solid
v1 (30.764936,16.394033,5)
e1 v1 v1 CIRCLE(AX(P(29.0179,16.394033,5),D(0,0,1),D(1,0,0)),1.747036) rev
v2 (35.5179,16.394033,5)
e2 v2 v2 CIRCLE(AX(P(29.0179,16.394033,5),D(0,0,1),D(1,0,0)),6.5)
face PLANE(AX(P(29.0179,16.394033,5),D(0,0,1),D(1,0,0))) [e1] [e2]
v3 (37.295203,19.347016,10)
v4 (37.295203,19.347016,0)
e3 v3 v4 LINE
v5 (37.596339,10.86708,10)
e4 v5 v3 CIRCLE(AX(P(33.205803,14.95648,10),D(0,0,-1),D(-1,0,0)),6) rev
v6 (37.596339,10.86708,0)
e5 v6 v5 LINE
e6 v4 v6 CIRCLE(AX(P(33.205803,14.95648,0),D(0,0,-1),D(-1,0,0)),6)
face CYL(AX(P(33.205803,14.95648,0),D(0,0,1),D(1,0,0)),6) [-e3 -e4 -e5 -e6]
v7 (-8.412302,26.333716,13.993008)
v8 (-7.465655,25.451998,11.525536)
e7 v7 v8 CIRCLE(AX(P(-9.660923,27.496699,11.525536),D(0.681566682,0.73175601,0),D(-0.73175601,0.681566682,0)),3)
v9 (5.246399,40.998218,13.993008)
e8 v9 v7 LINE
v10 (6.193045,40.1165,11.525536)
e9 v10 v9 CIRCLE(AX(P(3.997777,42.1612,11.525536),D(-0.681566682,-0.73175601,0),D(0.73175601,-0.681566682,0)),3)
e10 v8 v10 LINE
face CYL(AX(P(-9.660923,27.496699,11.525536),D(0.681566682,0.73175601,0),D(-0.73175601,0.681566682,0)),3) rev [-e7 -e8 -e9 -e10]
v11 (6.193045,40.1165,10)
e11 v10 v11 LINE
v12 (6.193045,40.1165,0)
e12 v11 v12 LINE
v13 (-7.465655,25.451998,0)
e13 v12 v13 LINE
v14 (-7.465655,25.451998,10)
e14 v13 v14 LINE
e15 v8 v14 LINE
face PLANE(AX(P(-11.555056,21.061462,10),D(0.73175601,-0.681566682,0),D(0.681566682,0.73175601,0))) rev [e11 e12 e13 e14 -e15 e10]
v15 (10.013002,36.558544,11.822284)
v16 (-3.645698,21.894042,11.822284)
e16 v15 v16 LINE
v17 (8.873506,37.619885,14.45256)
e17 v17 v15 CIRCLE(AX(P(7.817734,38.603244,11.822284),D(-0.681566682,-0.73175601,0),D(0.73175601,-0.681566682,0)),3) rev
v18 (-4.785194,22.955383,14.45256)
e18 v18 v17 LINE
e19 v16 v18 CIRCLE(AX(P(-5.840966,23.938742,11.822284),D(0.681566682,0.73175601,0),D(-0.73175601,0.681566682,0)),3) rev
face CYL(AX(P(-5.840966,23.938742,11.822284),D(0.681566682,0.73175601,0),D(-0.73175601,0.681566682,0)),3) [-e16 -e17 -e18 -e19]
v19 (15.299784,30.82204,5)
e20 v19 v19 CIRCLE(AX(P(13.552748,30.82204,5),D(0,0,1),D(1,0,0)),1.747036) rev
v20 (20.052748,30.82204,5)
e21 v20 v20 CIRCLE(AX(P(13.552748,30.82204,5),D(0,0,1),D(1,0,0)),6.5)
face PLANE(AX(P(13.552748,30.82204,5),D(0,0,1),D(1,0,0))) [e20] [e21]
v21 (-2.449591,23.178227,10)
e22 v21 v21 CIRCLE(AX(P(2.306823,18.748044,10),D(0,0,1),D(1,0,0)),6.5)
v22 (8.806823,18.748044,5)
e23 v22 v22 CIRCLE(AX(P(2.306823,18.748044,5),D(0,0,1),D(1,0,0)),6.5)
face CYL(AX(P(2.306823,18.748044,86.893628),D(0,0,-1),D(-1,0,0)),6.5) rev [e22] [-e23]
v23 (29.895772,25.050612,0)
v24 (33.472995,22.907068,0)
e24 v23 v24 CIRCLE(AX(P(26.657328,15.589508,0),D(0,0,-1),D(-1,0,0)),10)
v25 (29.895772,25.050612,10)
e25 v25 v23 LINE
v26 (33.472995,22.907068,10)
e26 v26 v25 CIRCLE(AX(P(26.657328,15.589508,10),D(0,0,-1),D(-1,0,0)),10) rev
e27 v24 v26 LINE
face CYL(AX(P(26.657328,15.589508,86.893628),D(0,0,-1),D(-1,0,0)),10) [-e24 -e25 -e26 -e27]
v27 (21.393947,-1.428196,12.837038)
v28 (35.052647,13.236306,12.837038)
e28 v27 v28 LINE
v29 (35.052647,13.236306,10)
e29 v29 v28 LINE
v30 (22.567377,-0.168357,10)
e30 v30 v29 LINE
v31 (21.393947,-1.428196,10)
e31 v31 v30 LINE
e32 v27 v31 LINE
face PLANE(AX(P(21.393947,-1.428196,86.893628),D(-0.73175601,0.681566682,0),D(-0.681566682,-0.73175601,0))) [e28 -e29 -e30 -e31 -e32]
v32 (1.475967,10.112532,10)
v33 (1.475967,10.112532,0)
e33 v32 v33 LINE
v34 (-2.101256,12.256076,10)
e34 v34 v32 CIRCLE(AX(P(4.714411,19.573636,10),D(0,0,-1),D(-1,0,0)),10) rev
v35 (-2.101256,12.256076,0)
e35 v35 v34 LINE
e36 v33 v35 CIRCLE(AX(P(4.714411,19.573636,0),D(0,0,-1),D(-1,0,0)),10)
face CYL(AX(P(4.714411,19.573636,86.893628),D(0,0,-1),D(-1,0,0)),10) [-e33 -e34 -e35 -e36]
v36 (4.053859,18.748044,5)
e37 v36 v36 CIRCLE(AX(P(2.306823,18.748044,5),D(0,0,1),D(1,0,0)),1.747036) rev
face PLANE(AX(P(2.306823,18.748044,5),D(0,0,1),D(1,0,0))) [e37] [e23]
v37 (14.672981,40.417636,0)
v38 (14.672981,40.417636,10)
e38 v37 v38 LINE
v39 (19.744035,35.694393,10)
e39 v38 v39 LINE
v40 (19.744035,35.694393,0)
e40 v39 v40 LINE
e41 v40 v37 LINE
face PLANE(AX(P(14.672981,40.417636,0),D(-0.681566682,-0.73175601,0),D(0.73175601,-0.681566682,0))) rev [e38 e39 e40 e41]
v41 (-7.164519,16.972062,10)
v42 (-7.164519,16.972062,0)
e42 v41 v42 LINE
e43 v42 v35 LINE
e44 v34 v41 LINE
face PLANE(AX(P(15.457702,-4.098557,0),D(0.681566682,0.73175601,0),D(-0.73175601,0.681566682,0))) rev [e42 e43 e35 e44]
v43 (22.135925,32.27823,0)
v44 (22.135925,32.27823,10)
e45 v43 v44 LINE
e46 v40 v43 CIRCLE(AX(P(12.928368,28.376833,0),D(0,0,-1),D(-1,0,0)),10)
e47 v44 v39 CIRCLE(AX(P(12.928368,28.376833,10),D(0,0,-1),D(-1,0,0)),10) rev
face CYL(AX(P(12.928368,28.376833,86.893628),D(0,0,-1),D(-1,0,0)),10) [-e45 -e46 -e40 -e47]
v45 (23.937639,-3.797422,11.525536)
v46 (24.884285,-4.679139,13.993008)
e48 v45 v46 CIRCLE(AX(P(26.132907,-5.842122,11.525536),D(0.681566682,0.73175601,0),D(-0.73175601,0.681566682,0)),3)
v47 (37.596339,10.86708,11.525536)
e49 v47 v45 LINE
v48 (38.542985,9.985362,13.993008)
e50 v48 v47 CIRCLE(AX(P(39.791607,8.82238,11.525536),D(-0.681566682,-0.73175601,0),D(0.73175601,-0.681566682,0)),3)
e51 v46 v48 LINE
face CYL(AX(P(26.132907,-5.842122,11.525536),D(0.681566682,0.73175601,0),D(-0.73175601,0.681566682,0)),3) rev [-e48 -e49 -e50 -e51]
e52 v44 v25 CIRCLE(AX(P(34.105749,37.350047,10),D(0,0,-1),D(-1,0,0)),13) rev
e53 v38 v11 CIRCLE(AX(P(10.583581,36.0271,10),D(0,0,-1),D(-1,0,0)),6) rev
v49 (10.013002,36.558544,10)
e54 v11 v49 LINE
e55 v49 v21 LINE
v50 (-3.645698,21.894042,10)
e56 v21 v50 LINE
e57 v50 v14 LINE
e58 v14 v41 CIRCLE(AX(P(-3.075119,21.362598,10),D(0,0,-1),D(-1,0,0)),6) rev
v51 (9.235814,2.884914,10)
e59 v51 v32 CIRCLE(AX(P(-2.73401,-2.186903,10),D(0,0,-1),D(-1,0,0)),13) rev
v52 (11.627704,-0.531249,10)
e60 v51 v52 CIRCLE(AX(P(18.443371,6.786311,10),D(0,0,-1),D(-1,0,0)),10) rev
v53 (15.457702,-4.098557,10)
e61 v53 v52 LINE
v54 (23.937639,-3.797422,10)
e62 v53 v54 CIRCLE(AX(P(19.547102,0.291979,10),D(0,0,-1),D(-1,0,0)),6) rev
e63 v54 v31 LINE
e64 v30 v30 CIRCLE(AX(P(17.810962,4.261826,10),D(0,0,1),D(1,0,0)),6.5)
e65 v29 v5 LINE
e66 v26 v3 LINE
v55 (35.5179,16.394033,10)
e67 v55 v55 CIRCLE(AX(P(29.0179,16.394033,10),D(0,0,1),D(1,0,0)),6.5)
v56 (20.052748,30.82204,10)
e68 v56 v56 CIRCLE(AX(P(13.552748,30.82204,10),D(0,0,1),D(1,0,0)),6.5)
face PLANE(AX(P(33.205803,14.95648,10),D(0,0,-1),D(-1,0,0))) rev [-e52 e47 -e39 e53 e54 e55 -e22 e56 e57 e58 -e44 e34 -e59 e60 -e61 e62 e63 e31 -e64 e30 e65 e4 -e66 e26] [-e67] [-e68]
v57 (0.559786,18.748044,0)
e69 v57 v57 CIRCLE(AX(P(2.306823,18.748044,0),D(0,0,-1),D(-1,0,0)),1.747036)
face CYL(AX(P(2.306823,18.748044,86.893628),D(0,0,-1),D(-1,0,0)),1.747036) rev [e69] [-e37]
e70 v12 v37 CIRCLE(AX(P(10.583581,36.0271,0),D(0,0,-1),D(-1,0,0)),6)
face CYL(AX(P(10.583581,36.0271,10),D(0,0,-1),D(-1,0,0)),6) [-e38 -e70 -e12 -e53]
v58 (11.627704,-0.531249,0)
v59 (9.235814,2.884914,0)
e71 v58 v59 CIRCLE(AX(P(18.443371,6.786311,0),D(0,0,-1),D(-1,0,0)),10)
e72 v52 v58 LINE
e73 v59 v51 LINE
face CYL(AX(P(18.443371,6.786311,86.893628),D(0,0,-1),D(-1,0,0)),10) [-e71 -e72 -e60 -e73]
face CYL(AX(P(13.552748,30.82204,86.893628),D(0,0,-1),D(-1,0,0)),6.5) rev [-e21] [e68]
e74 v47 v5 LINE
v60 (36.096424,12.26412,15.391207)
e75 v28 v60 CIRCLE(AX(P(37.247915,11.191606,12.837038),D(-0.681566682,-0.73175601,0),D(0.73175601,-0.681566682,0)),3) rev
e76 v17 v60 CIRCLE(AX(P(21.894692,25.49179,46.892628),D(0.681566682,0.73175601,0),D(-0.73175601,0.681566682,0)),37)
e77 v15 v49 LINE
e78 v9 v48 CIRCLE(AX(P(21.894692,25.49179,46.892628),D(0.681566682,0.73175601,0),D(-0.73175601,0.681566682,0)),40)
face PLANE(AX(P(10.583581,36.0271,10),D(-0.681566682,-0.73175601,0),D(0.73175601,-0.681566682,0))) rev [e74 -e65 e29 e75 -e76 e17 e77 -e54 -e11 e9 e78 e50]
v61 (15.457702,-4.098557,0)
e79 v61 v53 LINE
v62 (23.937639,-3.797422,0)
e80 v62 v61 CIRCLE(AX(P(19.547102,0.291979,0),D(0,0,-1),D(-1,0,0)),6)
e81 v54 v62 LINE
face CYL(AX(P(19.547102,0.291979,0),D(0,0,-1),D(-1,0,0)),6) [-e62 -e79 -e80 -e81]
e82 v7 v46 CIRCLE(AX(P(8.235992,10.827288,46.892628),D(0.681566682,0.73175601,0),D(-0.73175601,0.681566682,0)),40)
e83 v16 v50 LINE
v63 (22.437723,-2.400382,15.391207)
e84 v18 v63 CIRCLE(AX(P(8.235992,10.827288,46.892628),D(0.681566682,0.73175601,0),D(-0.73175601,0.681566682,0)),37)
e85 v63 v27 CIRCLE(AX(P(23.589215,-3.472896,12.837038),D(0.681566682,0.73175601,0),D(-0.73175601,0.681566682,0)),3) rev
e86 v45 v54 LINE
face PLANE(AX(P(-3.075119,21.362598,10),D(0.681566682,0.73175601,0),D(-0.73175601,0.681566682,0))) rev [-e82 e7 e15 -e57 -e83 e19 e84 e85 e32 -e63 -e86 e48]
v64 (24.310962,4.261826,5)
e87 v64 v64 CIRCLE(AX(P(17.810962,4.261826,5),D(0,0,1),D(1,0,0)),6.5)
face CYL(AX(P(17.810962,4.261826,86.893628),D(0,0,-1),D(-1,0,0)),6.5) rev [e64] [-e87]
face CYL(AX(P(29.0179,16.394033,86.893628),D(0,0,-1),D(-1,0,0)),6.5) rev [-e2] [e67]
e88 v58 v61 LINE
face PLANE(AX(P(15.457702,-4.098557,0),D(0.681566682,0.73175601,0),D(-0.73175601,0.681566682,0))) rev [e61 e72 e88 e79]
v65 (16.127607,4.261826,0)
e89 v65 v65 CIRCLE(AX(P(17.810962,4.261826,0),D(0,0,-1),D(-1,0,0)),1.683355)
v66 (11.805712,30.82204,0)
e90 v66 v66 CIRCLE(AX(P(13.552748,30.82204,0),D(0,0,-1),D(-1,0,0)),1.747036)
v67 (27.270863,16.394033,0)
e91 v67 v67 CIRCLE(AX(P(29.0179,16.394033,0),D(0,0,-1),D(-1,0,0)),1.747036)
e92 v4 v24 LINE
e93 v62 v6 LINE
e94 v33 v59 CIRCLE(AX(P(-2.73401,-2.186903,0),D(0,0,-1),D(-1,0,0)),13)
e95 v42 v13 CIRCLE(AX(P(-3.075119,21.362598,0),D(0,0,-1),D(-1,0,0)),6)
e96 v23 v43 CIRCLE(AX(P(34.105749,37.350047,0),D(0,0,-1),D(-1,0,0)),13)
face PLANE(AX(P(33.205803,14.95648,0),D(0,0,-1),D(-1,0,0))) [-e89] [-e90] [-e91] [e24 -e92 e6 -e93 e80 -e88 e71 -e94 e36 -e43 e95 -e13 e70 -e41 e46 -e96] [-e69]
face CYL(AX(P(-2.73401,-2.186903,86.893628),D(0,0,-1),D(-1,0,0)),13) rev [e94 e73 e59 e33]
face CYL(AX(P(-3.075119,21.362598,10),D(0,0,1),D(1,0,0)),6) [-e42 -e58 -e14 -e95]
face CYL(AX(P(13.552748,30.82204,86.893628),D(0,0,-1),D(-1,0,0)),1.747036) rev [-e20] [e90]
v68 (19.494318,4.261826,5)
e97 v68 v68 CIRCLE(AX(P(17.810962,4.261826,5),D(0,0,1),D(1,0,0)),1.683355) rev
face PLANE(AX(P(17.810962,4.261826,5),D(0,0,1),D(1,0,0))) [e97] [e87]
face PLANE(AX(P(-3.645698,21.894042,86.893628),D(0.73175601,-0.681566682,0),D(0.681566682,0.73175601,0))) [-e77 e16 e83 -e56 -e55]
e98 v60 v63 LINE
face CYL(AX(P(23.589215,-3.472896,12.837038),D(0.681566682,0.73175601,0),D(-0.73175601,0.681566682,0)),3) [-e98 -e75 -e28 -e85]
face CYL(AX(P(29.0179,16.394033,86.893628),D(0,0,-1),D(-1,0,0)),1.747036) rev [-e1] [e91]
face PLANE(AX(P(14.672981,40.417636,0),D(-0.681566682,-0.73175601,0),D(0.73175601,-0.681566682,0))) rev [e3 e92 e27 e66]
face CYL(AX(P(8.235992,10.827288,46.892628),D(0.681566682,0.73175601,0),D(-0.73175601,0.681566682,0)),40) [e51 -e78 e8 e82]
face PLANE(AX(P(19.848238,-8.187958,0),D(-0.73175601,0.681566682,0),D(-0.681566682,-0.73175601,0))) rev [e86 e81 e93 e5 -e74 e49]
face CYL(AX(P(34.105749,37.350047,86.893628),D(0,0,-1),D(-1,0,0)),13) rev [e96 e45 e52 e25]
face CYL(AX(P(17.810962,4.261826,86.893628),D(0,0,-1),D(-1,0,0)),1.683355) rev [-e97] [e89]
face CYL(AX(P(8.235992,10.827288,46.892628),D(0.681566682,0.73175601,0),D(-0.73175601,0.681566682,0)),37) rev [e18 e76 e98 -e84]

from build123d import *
from build123d.topology import SkipClean

# Parameters (mm, degrees)
BOSS_EXTRUDE2_DEPTH            = 10
SKETCH3_R                      = 40
SKETCH3_R_2                    = 37
BOSS_EXTRUDE3_DEPTH            = 20.040152
CUT_EXTRUDE1_REACH             = 115.803
CUT_EXTRUDE1_END_RADIUS        = 37
SKETCH5_R                      = 1.74703634
SKETCH5_R_2                    = 1.683355043
SKETCH10_W                     = 30.914979244
SKETCH10_H                     = 10
BOSS_EXTRUDE8_DEPTH            = 6
SKETCH11_W                     = 30.914979244
SKETCH11_H                     = 10
BOSS_EXTRUDE9_DEPTH            = 6
SKETCH12_W                     = 10
SKETCH12_H                     = 32.040152213
BOSS_EXTRUDE10_DEPTH           = 6
SKETCH13_W                     = 10
SKETCH13_H                     = 32.040152213
BOSS_EXTRUDE11_DEPTH           = 6
FILLET3_R                      = 6
BOSS_EXTRUDE12_REACH           = 108.364
BOSS_EXTRUDE13_REACH           = 108.364
SKETCH17_R                     = 6.5
CUT_EXTRUDE3_DEPTH             = 5
CUT_EXTRUDE3_DIRECTION_2_REACH = 108.364
CUT_EXTRUDE4_REACH             = 108.364
CUT_EXTRUDE4_END_RADIUS        = 37
FILLET4_R                      = 3
CUT_EXTRUDE5_REACH             = 115.803
FILLET5_R                      = 10


with BuildPart() as part:
    # Sketch1 → Boss-Extrude2 (new body)
    with BuildSketch(Plane.XY):
        Polygon((-3.075119388, 21.362598398), (19.547102475, 0.291978577), (33.205802521, 14.956480402), (10.583580658, 36.027100222), align=None)
    extrude(amount=BOSS_EXTRUDE2_DEPTH)

    # Sketch3 → Boss-Extrude3 (add)
    with BuildSketch(Plane(origin=(22.884598517, 24.569778644, 0), x_dir=(-0.7317560100777086, 0.6815666817818727, 0), z_dir=(0.6815666817818727, 0.7317560100777086, 0))):
        with Locations((1.352782776, 46.892628188)):
            Circle(SKETCH3_R)
        with Locations((1.352782776, 46.892628188)):
            Circle(SKETCH3_R_2, mode=Mode.SUBTRACT)
    extrude(amount=-BOSS_EXTRUDE3_DEPTH)

    # Cut-Extrude1: up to this cylinder (the profile starts outside it)
    cut_extrude1_end = Plane(origin=(15.043707154, 18.136311869, 46.892628188), z_dir=(0.6815666817818727, 0.7317560100777086, 0)) * Cylinder(CUT_EXTRUDE1_END_RADIUS, 323.139339437, mode=Mode.PRIVATE)
    # Sketch5 → Cut-Extrude1 (cut, up to the surface)
    with BuildSketch(Plane(origin=(0, 0, 0), x_dir=(-1, 0, 0), z_dir=(0, 0, -1)), mode=Mode.PRIVATE) as cut_extrude1_sk1:
        with Locations((-13.552748015, 30.82203985)):
            Circle(SKETCH5_R)
    cut_extrude1_tool1 = extrude(cut_extrude1_sk1.sketch, amount=-CUT_EXTRUDE1_REACH, mode=Mode.PRIVATE) - cut_extrude1_end
    add(cut_extrude1_tool1.solids().sort_by_distance((13.552748, 30.82204, 0))[0], mode=Mode.SUBTRACT)
    # Sketch5 → Cut-Extrude1 (cut, up to the surface)
    with BuildSketch(Plane(origin=(0, 0, 0), x_dir=(-1, 0, 0), z_dir=(0, 0, -1)), mode=Mode.PRIVATE) as cut_extrude1_sk2:
        with Locations((-2.306822594, 18.748043967)):
            Circle(SKETCH5_R)
    cut_extrude1_tool2 = extrude(cut_extrude1_sk2.sketch, amount=-CUT_EXTRUDE1_REACH, mode=Mode.PRIVATE) - cut_extrude1_end
    add(cut_extrude1_tool2.solids().sort_by_distance((2.306823, 18.748044, 0))[0], mode=Mode.SUBTRACT)
    # Sketch5 → Cut-Extrude1 (cut, up to the surface)
    with BuildSketch(Plane(origin=(0, 0, 0), x_dir=(-1, 0, 0), z_dir=(0, 0, -1)), mode=Mode.PRIVATE) as cut_extrude1_sk3:
        with Locations((-17.810962495, 4.261826269)):
            Circle(SKETCH5_R_2)
    cut_extrude1_tool3 = extrude(cut_extrude1_sk3.sketch, amount=-CUT_EXTRUDE1_REACH, mode=Mode.PRIVATE) - cut_extrude1_end
    add(cut_extrude1_tool3.solids().sort_by_distance((17.810962, 4.261826, 0))[0], mode=Mode.SUBTRACT)
    # Sketch5 → Cut-Extrude1 (cut, up to the surface)
    with BuildSketch(Plane(origin=(0, 0, 0), x_dir=(-1, 0, 0), z_dir=(0, 0, -1)), mode=Mode.PRIVATE) as cut_extrude1_sk4:
        with Locations((-29.017899523, 16.394033311)):
            Circle(SKETCH5_R)
    cut_extrude1_tool4 = extrude(cut_extrude1_sk4.sketch, amount=-CUT_EXTRUDE1_REACH, mode=Mode.PRIVATE) - cut_extrude1_end
    add(cut_extrude1_tool4.solids().sort_by_distance((29.0179, 16.394033, 0))[0], mode=Mode.SUBTRACT)

    # Sketch10 → Boss-Extrude8 (add)
    with BuildSketch(Plane(origin=(9.22589847, 9.905276819, 0), x_dir=(0.7317560100777085, -0.6815666817818729, 0), z_dir=(-0.6815666817818729, -0.7317560100777085, 0))):
        with Locations((-1.352782776, 5)):
            Rectangle(SKETCH10_W, SKETCH10_H)
    extrude(amount=BOSS_EXTRUDE8_DEPTH)

    # Sketch11 → Boss-Extrude9 (add)
    with BuildSketch(Plane(origin=(22.884598517, 24.569778644, 0), x_dir=(0.7317560100777083, -0.681566681781873, 0), z_dir=(0.681566681781873, 0.7317560100777083, 0))):
        with Locations((-1.352782776, -5)):
            Rectangle(SKETCH11_W, SKETCH11_H)
    extrude(amount=BOSS_EXTRUDE9_DEPTH)

    # Sketch12 → Boss-Extrude10 (add)
    with BuildSketch(Plane(origin=(-12.301017858, 11.457321578, 0), x_dir=(0, 0, 1), z_dir=(-0.7317560100777086, 0.6815666817818726, 0))):
        with Locations((5, 23.556386958)):
            Rectangle(SKETCH12_W, SKETCH12_H)
    extrude(amount=BOSS_EXTRUDE10_DEPTH)

    # Sketch13 → Boss-Extrude11 (add)
    with BuildSketch(Plane(origin=(10.321204005, -9.613298242, 0), x_dir=(0, 0, -1), z_dir=(0.7317560100777092, -0.6815666817818721, 0))):
        with Locations((-5, 23.556386958)):
            Rectangle(SKETCH13_W, SKETCH13_H)
    extrude(amount=BOSS_EXTRUDE11_DEPTH)

    # Fillet3
    fillet3_edges = [part.edges().sort_by_distance(p)[0] for p in [
        (10.282444688, 44.507036374, 5),
        (-11.555055539, 21.061462428, 5),
        (41.685738672, 15.257616372, 5),
        (19.848238445, -8.187957574, 5),
    ]]
    fillet(fillet3_edges, radius=FILLET3_R)

    # Sketch15 → Boss-Extrude12 (add, up to next)
    with BuildSketch(Plane.XY.offset(10), mode=Mode.PRIVATE) as boss_extrude12_sk1:
        Polygon((19.547102475, 0.291978577), (23.937638536, -3.797421514), (37.596338582, 10.867080311), (33.205802521, 14.956480402), align=None)
    boss_extrude12_tool1 = extrude(boss_extrude12_sk1.sketch, amount=BOSS_EXTRUDE12_REACH, mode=Mode.PRIVATE) - part.part
    add(boss_extrude12_tool1.solids().sort_by_distance((28.571721, 5.579529, 10))[0])

    # Sketch16 → Boss-Extrude13 (add, up to next)
    with BuildSketch(Plane.XY.offset(10), mode=Mode.PRIVATE) as boss_extrude13_sk1:
        Polygon((10.583580658, 36.027100222), (6.193044598, 40.116500313), (-7.465655449, 25.451998488), (-3.075119388, 21.362598398), align=None)
    boss_extrude13_tool1 = extrude(boss_extrude13_sk1.sketch, amount=BOSS_EXTRUDE13_REACH, mode=Mode.PRIVATE) - part.part
    add(boss_extrude13_tool1.solids().sort_by_distance((1.558963, 30.739549, 10))[0])

    # Sketch17 → Cut-Extrude3 (cut)
    with BuildSketch(Plane.XY.offset(10)):
        with Locations(Location((2.306822594, 18.748043967, 0), (0, 0, 152.697494073))):
            Circle(SKETCH17_R)
        with Locations(Location((13.552748015, 30.82203985, 0), (0, 0, 121.093351503))):
            Circle(SKETCH17_R)
        with Locations(Location((17.810962495, 4.261826269, 0), (0, 0, 152.393126662))):
            Circle(SKETCH17_R)
        with Locations(Location((29.017899523, 16.394033311, 0), (0, 0, 120.935167822))):
            Circle(SKETCH17_R)
    extrude(amount=-CUT_EXTRUDE3_DEPTH, mode=Mode.SUBTRACT)

    # Sketch17 → Cut-Extrude3 direction 2 (cut, up to next)
    with BuildSketch(Plane.XY.offset(10), mode=Mode.PRIVATE) as cut_extrude3_direction_2_sk1:
        with Locations(Location((2.306822594, 18.748043967, 0), (0, 0, 152.697494073))):
            Circle(SKETCH17_R)
    cut_extrude3_direction_2_tool1 = extrude(cut_extrude3_direction_2_sk1.sketch, amount=CUT_EXTRUDE3_DIRECTION_2_REACH, mode=Mode.PRIVATE) & part.part
    # Sketch17 → Cut-Extrude3 direction 2 (cut, up to next)
    with BuildSketch(Plane.XY.offset(10), mode=Mode.PRIVATE) as cut_extrude3_direction_2_sk2:
        with Locations(Location((13.552748015, 30.82203985, 0), (0, 0, 121.093351503))):
            Circle(SKETCH17_R)
    cut_extrude3_direction_2_tool2 = extrude(cut_extrude3_direction_2_sk2.sketch, amount=CUT_EXTRUDE3_DIRECTION_2_REACH, mode=Mode.PRIVATE) & part.part
    # Sketch17 → Cut-Extrude3 direction 2 (cut, up to next)
    with BuildSketch(Plane.XY.offset(10), mode=Mode.PRIVATE) as cut_extrude3_direction_2_sk3:
        with Locations(Location((17.810962495, 4.261826269, 0), (0, 0, 152.393126662))):
            Circle(SKETCH17_R)
    cut_extrude3_direction_2_tool3 = extrude(cut_extrude3_direction_2_sk3.sketch, amount=CUT_EXTRUDE3_DIRECTION_2_REACH, mode=Mode.PRIVATE) & part.part
    # Sketch17 → Cut-Extrude3 direction 2 (cut, up to next)
    with BuildSketch(Plane.XY.offset(10), mode=Mode.PRIVATE) as cut_extrude3_direction_2_sk4:
        with Locations(Location((29.017899523, 16.394033311, 0), (0, 0, 120.935167822))):
            Circle(SKETCH17_R)
    cut_extrude3_direction_2_tool4 = extrude(cut_extrude3_direction_2_sk4.sketch, amount=CUT_EXTRUDE3_DIRECTION_2_REACH, mode=Mode.PRIVATE) & part.part
    add(cut_extrude3_direction_2_tool1.solids().sort_by_distance((2.306823, 18.748044, 10))[0], mode=Mode.SUBTRACT)
    add(cut_extrude3_direction_2_tool2.solids().sort_by_distance((13.552748, 30.82204, 10))[0], mode=Mode.SUBTRACT)
    add(cut_extrude3_direction_2_tool3.solids().sort_by_distance((17.810962, 4.261826, 10))[0], mode=Mode.SUBTRACT)
    add(cut_extrude3_direction_2_tool4.solids().sort_by_distance((29.0179, 16.394033, 10))[0], mode=Mode.SUBTRACT)

    # Cut-Extrude4: up to this cylinder (the profile starts outside it)
    with SkipClean():  # the faces are left unmerged after this step: merging them gives an invalid solid
        cut_extrude4_end = Plane(origin=(15.133329832, 18.232534198, 46.892628188), z_dir=(0.6815666817818727, 0.7317560100777086, 0)) * Cylinder(CUT_EXTRUDE4_END_RADIUS, 291.728, mode=Mode.PRIVATE)
        # Sketch18 → Cut-Extrude4 (cut, up to the surface)
        with BuildSketch(Plane.XY.offset(10), mode=Mode.PRIVATE) as cut_extrude4_sk1:
            Polygon((21.393947235, -1.428195685), (-3.645697664, 21.894042126), (10.148979711, 36.704534402), (35.18862461, 13.382296591), align=None)
        cut_extrude4_tool1 = extrude(cut_extrude4_sk1.sketch, amount=CUT_EXTRUDE4_REACH, mode=Mode.PRIVATE) - cut_extrude4_end
        add(cut_extrude4_tool1.solids().sort_by_distance((15.771463, 17.638169, 10))[0], mode=Mode.SUBTRACT)
        add(cut_extrude4_tool1.solids().sort_by_distance((15.771463, 17.638169, 10))[1], mode=Mode.SUBTRACT)
    add(part.part.scale(1), mode=Mode.REPLACE)  # the faces are merged on a copy

    # Fillet4
    fillet4_edges = [part.edges().sort_by_distance(p)[0] for p in [
        (30.766988562, 3.534829402, 13.135019577),
        (-0.636305422, 32.784249404, 13.135019577),
        (3.18365236, 29.226293038, 13.645787353),
        (28.223297258, 5.904055227, 14.555786818),
    ]]
    fillet(fillet4_edges, radius=FILLET4_R)

    # Sketch19 → Cut-Extrude5 (cut, up to next)
    with BuildSketch(Plane(origin=(0, 0, 0), x_dir=(-1, 0, 0), z_dir=(0, 0, -1)), mode=Mode.PRIVATE) as cut_extrude5_sk1:
        with BuildLine():
            Line((-31.678269443, 24.578698129), (-21.538760737, 34.022763101))
            ThreePointArc((-21.538760737, 34.022763101), (-25.245381726, 27.837218595), (-31.678269443, 24.578698129))
        make_face()
    cut_extrude5_tool1 = extrude(cut_extrude5_sk1.sketch, amount=-CUT_EXTRUDE5_REACH, mode=Mode.PRIVATE) & part.part
    # Sketch19 → Cut-Extrude5 (cut, up to next)
    with BuildSketch(Plane(origin=(0, 0, 0), x_dir=(-1, 0, 0), z_dir=(0, 0, -1)), mode=Mode.PRIVATE) as cut_extrude5_sk2:
        with BuildLine():
            Line((0.30653048, 10.58444578), (-9.832978226, 1.140380807))
            ThreePointArc((-9.832978226, 1.140380807), (-6.126357236, 7.325925314), (0.30653048, 10.58444578))
        make_face()
    cut_extrude5_tool2 = extrude(cut_extrude5_sk2.sketch, amount=-CUT_EXTRUDE5_REACH, mode=Mode.PRIVATE) & part.part
    add(cut_extrude5_tool1.solids().sort_by_distance((26.059499, 28.711286, 0))[0], mode=Mode.SUBTRACT)
    add(cut_extrude5_tool2.solids().sort_by_distance((5.31224, 6.451858, 0))[0], mode=Mode.SUBTRACT)

    # Fillet5
    fillet5_edges = [part.edges().sort_by_distance(p)[0] for p in [
        (21.538760737, 34.022763101, 5),
        (31.678269443, 24.578698129, 5),
        (9.832978226, 1.140380807, 5),
        (-0.30653048, 10.58444578, 5),
    ]]
    fillet(fillet5_edges, radius=FILLET5_R)


solid = part.part
